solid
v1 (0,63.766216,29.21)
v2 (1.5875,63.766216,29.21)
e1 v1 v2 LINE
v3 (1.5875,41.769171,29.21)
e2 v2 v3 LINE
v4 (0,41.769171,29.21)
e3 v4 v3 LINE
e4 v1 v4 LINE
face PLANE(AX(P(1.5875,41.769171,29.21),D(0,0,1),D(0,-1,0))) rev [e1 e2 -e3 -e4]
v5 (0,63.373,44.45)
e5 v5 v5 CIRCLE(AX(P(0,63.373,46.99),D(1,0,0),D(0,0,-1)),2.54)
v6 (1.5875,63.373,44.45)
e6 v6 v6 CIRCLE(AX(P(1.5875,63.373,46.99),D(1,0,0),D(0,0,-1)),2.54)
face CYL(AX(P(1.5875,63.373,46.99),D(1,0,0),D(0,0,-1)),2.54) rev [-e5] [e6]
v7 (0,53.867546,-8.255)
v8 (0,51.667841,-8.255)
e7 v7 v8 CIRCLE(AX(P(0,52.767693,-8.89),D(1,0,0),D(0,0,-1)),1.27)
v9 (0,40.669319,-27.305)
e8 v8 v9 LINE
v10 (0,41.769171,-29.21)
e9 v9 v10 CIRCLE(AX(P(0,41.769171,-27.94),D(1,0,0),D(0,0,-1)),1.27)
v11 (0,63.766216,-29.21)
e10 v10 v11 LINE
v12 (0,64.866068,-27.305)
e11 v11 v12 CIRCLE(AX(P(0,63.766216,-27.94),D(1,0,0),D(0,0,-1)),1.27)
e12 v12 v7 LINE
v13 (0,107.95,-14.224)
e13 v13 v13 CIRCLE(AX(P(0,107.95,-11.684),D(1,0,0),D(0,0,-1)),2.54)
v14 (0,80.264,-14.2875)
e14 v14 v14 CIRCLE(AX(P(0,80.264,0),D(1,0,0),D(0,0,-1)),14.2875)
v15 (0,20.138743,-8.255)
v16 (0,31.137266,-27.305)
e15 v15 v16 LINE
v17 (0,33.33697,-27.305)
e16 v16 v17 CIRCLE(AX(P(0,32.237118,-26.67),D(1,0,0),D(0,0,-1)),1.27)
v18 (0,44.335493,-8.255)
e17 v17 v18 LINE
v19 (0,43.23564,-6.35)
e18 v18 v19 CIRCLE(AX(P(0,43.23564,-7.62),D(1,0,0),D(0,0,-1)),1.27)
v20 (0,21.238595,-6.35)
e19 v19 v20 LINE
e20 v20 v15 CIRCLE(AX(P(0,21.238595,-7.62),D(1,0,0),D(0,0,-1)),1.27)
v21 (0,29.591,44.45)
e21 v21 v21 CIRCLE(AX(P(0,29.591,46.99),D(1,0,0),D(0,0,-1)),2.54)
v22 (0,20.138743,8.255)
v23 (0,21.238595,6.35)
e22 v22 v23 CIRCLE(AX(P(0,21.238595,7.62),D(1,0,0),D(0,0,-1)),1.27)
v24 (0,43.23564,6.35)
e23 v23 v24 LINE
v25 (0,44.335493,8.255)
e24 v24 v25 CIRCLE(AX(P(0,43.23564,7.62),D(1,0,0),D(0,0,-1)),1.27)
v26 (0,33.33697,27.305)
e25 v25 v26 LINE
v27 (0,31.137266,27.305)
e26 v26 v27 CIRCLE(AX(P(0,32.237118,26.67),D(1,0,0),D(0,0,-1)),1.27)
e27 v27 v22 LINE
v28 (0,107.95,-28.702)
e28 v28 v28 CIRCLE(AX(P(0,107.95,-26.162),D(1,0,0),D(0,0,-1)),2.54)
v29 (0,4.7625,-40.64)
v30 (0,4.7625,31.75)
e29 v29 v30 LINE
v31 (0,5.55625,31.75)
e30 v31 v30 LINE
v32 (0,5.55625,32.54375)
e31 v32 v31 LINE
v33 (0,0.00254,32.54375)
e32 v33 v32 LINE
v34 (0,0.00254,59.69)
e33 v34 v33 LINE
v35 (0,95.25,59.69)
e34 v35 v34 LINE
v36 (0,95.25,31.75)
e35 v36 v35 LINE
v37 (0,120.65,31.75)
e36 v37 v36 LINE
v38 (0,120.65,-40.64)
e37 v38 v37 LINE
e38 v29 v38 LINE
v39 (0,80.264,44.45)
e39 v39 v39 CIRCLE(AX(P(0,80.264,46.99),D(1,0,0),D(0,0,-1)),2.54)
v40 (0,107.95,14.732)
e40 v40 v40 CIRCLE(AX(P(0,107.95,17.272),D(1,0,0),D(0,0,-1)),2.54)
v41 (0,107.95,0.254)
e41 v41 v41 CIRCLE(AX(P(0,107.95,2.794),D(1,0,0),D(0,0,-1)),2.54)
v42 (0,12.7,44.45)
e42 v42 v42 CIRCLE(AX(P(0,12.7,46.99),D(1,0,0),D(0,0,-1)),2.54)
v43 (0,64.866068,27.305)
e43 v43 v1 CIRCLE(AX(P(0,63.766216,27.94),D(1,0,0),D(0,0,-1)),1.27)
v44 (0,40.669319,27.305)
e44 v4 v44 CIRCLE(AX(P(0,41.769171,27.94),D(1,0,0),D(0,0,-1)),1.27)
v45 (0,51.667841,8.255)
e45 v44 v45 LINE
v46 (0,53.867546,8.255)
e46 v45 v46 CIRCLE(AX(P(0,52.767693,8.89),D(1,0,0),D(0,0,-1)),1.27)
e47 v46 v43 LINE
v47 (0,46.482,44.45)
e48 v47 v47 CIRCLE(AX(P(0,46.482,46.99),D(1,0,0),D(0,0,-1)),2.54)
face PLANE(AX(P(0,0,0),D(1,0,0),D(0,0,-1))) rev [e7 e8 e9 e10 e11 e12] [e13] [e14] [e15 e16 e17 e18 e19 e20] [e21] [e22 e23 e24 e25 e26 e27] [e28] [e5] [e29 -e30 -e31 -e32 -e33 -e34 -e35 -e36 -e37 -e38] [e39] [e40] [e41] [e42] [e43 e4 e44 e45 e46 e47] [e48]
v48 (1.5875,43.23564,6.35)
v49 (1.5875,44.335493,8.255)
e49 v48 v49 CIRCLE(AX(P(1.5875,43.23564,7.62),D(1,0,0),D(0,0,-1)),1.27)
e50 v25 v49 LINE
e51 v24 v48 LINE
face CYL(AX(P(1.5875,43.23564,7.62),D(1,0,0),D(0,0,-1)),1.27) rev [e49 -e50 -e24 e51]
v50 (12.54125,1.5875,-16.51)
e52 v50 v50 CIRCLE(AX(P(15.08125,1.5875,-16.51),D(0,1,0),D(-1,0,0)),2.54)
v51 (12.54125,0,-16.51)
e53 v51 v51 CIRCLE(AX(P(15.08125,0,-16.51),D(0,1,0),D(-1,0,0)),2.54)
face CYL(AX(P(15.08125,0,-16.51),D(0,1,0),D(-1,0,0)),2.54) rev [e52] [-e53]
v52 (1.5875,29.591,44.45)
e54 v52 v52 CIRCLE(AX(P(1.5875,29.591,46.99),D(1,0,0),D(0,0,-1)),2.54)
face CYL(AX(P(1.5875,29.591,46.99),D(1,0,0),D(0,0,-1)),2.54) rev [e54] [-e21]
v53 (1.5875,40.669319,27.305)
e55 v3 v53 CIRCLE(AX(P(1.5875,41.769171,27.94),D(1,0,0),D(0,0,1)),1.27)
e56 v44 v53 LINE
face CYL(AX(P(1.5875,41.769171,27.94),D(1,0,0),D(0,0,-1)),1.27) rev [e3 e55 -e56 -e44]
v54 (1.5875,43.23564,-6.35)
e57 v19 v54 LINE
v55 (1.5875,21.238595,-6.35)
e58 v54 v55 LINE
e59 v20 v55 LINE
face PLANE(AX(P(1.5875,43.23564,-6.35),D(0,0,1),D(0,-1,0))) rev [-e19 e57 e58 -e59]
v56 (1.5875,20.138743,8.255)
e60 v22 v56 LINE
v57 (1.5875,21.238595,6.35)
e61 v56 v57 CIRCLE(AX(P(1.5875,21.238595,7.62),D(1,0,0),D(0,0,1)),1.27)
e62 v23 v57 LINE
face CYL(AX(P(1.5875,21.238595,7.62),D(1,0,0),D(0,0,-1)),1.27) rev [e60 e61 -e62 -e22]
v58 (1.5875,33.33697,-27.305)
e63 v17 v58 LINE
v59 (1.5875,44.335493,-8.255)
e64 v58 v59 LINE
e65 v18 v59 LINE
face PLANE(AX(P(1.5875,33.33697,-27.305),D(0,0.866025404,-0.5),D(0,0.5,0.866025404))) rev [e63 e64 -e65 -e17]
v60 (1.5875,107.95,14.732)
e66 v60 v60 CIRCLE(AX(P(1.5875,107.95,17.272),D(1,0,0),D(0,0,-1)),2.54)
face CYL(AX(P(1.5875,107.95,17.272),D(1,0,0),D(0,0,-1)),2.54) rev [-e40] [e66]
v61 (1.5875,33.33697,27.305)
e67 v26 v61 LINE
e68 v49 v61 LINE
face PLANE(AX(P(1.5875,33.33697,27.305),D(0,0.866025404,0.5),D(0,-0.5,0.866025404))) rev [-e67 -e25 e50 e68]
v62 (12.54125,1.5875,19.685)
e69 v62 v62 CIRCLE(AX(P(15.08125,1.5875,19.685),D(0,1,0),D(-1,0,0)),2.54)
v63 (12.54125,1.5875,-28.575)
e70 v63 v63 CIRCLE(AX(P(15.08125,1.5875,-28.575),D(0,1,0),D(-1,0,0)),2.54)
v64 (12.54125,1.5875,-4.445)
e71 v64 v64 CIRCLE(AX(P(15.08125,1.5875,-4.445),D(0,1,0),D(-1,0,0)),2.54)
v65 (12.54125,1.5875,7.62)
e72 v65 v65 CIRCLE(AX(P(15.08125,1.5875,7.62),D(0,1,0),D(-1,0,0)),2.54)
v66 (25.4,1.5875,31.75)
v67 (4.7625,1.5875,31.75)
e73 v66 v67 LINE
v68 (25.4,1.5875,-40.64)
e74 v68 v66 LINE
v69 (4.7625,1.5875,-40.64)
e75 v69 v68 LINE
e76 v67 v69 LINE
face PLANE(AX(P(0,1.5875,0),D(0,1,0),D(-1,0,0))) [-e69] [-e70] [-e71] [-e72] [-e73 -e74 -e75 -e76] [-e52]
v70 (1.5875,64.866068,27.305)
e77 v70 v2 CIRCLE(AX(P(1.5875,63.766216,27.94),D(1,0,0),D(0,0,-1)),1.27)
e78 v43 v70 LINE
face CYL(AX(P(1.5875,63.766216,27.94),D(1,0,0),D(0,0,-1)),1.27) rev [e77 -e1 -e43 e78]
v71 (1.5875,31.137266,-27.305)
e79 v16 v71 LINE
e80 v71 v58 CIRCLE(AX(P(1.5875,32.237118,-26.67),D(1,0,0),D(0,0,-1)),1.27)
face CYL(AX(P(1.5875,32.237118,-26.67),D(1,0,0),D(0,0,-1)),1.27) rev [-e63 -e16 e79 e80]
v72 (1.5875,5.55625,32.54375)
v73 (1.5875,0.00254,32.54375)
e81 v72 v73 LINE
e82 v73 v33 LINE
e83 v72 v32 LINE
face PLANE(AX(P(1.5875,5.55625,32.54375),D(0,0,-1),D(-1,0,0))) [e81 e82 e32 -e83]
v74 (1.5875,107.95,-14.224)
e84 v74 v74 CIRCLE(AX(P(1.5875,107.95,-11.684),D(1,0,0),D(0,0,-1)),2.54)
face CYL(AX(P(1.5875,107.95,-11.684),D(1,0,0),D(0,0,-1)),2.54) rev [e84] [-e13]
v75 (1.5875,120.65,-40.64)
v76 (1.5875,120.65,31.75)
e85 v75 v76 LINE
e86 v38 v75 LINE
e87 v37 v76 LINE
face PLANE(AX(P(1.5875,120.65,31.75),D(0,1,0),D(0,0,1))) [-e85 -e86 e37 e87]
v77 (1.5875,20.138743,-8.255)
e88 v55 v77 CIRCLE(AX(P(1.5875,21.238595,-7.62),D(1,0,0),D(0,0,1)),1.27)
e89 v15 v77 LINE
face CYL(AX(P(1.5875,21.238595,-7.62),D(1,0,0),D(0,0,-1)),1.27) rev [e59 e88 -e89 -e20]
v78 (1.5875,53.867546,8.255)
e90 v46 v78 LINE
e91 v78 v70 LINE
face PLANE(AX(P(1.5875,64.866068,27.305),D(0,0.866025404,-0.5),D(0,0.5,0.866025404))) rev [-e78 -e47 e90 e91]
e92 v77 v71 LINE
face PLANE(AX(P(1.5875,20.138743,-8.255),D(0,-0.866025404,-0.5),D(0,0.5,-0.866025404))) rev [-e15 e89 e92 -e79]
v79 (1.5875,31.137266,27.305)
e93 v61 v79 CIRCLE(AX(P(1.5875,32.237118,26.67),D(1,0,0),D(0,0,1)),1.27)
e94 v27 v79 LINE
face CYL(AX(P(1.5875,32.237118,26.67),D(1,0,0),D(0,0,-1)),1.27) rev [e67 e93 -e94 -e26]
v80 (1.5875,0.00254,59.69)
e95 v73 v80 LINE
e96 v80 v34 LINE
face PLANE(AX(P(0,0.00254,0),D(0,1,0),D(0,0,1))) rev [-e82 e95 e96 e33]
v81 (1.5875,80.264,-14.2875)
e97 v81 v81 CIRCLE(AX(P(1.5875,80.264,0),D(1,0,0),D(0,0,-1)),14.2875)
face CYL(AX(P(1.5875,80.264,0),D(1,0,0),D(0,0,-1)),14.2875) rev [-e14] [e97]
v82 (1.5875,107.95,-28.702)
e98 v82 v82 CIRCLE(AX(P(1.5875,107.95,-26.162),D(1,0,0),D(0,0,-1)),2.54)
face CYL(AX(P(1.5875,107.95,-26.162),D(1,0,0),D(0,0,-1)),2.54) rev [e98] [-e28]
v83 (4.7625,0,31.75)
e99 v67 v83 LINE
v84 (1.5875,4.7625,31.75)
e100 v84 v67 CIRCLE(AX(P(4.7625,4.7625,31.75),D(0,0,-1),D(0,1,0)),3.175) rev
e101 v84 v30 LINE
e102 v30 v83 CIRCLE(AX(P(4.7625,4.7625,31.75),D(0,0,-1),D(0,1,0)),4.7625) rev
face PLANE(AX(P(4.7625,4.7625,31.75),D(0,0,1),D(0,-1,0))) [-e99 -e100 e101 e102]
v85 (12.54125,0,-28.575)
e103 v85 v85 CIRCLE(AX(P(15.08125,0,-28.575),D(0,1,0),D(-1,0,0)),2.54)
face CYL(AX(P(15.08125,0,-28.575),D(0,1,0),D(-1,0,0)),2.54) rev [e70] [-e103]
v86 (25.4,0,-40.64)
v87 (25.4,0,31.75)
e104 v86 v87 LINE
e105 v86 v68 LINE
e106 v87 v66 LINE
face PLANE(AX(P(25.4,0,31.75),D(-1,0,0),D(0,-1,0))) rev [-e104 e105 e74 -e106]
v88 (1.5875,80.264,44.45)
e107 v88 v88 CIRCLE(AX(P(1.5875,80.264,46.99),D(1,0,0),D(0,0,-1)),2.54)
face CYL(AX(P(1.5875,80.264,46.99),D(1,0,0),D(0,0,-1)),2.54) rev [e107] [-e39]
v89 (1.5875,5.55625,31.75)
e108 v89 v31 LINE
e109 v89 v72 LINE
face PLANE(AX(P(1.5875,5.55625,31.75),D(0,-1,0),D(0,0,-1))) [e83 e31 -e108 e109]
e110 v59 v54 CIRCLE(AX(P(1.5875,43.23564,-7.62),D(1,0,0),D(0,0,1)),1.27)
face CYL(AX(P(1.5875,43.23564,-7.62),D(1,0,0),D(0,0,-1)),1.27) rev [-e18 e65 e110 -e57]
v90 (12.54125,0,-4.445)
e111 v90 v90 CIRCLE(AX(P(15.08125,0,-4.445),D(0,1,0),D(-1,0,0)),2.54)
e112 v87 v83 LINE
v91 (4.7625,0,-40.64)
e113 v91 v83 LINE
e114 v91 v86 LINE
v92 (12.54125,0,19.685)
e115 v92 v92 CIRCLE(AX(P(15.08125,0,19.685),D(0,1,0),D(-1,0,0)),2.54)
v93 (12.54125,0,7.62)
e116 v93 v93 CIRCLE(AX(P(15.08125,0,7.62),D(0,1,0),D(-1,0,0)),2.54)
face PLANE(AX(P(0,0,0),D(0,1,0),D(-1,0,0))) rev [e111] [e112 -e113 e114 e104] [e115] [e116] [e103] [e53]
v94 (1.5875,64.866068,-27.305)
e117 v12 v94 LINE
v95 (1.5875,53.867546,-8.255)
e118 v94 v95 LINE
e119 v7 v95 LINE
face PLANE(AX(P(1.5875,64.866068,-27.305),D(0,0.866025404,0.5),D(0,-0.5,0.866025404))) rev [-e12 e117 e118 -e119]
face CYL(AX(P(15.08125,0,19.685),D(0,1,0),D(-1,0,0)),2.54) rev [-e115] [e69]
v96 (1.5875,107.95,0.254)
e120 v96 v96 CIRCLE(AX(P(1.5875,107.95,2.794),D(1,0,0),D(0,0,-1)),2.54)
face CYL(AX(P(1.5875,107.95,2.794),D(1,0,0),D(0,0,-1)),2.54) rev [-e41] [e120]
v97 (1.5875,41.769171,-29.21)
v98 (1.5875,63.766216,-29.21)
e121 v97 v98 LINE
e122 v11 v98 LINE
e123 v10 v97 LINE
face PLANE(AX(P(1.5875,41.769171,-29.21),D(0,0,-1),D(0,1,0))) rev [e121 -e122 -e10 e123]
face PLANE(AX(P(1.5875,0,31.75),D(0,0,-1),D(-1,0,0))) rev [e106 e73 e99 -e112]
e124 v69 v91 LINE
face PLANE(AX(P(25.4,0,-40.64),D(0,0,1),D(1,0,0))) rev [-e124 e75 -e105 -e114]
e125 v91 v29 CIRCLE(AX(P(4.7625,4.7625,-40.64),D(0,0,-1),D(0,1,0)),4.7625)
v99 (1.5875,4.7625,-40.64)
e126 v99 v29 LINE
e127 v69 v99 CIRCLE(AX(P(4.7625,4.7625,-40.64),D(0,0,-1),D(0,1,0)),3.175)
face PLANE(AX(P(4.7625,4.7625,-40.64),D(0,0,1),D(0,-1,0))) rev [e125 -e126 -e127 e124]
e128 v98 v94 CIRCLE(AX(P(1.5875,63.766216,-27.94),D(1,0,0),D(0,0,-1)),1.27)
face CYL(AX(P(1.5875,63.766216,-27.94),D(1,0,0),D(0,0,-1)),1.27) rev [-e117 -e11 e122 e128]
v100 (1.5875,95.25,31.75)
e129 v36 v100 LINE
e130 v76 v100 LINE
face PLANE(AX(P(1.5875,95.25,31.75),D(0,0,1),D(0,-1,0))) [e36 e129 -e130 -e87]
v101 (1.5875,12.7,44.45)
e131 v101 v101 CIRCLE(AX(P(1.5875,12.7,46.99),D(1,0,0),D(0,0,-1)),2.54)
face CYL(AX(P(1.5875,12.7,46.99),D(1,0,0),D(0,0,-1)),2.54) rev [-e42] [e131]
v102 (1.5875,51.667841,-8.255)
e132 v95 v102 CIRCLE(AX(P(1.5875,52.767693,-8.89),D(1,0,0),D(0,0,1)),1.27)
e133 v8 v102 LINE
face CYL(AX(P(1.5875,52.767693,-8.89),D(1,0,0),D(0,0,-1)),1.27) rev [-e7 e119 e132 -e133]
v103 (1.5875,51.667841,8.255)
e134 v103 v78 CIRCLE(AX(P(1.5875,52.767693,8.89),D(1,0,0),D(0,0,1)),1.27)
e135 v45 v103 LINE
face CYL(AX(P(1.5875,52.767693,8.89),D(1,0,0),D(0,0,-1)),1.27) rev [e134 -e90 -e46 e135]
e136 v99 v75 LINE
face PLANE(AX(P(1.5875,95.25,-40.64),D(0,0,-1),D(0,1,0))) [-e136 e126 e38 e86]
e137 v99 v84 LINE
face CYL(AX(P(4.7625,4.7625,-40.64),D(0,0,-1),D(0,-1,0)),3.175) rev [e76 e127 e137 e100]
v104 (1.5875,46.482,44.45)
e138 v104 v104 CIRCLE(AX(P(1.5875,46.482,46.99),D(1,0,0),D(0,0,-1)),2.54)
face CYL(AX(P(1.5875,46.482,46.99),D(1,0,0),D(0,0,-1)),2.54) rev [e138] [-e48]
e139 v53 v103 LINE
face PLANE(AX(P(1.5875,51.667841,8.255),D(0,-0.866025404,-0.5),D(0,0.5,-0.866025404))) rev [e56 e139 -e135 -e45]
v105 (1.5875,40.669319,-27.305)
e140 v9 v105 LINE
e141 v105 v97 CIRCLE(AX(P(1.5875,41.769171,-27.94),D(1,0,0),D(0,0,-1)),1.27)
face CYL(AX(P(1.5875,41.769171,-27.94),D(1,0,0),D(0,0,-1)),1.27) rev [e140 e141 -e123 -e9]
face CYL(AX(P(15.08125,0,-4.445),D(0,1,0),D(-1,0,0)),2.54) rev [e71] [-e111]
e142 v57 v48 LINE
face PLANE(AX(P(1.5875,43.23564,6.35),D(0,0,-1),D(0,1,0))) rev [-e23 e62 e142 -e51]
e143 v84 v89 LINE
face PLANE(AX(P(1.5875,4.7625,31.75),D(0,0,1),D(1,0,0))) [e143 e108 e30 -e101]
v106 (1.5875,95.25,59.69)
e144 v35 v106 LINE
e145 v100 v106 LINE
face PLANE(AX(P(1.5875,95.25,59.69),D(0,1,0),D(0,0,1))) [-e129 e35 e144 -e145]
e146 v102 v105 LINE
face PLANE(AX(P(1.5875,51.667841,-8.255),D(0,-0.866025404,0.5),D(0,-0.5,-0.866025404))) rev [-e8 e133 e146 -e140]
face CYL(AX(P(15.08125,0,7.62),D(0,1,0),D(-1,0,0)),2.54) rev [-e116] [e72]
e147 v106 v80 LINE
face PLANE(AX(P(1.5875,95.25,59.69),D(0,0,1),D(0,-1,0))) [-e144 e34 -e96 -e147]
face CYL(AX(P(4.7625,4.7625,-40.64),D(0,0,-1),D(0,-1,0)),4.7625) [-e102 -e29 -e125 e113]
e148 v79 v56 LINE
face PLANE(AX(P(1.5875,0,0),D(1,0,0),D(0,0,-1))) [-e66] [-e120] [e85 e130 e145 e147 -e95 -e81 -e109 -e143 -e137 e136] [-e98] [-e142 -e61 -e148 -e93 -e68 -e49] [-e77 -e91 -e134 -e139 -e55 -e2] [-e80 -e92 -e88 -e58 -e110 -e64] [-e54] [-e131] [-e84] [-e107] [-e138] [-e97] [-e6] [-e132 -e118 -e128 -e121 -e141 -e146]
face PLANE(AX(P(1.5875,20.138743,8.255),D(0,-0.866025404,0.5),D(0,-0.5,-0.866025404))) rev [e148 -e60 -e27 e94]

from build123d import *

# Parameters (mm, degrees)
SKETCH2_R                     = 14.2875
SKETCH2_R_2                   = 2.54
BOSS_EXTRUDE1_DEPTH           = 1.5875
SKETCH7_W                     = 1.5875
SKETCH7_H                     = 27.94
CUT_EXTRUDE1_DEPTH            = 0.00254
EDGE_FLANGE2_STRIP_W          = 12.7
EDGE_FLANGE2_STRIP_H          = 1.5875
EDGE_FLANGE2_STRIP_CUT_DEPTH  = 72.39
EDGE_FLANGE2_RELIEF_W         = 13.49375
EDGE_FLANGE2_RELIEF_H         = 0.79375
EDGE_FLANGE2_RELIEF_CUT_DEPTH = 1.5875
EDGE_FLANGE2_DEPTH            = 72.39
SKETCH14_R                    = 2.54
CUT_EXTRUDE2_DEPTH            = 2.54


# Sheet-metal steps are written as plain solids
with BuildPart() as part:
    # Sketch2 → Boss-Extrude1 (new body)
    with BuildSketch(Plane(origin=(0, 0, 0), x_dir=(0, 0, -1), z_dir=(1, 0, 0))):
        Polygon((-59.69, 95.25), (-59.69, 0), (40.64, 0), (40.64, 95.25), (40.64, 120.65), (-31.75, 120.65), (-31.75, 95.25), align=None)
        with Locations((0, 80.264)):
            Circle(SKETCH2_R, mode=Mode.SUBTRACT)
        with Locations((-46.99, 80.264)):
            Circle(SKETCH2_R_2, mode=Mode.SUBTRACT)
        with Locations((-46.99, 63.373)):
            Circle(SKETCH2_R_2, mode=Mode.SUBTRACT)
        with Locations((-17.272, 107.95)):
            Circle(SKETCH2_R_2, mode=Mode.SUBTRACT)
        with Locations((-2.794, 107.95)):
            Circle(SKETCH2_R_2, mode=Mode.SUBTRACT)
        with Locations((11.684, 107.95)):
            Circle(SKETCH2_R_2, mode=Mode.SUBTRACT)
        with Locations((26.162, 107.95)):
            Circle(SKETCH2_R_2, mode=Mode.SUBTRACT)
        with Locations((-46.99, 46.482)):
            Circle(SKETCH2_R_2, mode=Mode.SUBTRACT)
        with Locations((-46.99, 29.591)):
            Circle(SKETCH2_R_2, mode=Mode.SUBTRACT)
        with Locations((-46.99, 12.7)):
            Circle(SKETCH2_R_2, mode=Mode.SUBTRACT)
        with BuildLine():
            Line((-27.305, 64.866068321), (-8.255, 53.867545693))
            ThreePointArc((-8.255, 53.867545693), (-7.62, 52.76769343), (-8.255, 51.667841167))
            Line((-8.255, 51.667841167), (-27.305, 40.669318539))
            ThreePointArc((-27.305, 40.669318539), (-28.575, 40.669318539), (-29.21, 41.769170802))
            Line((-29.21, 41.769170802), (-29.21, 63.766216058))
            ThreePointArc((-29.21, 63.766216058), (-28.575, 64.866068321), (-27.305, 64.866068321))
        make_face(mode=Mode.SUBTRACT)
        with BuildLine():
            Line((-6.35, 43.235640486), (-6.35, 21.238595229))
            ThreePointArc((-6.35, 21.238595229), (-6.985, 20.138742967), (-8.255, 20.138742967))
            Line((-8.255, 20.138742967), (-27.305, 31.137265595))
            ThreePointArc((-27.305, 31.137265595), (-27.94, 32.237117857), (-27.305, 33.33697012))
            Line((-27.305, 33.33697012), (-8.255, 44.335492748))
            ThreePointArc((-8.255, 44.335492748), (-6.985, 44.335492748), (-6.35, 43.235640486))
        make_face(mode=Mode.SUBTRACT)
        with BuildLine():
            Line((8.255, 20.138742967), (27.305, 31.137265595))
            ThreePointArc((27.305, 31.137265595), (27.94, 32.237117857), (27.305, 33.33697012))
            Line((27.305, 33.33697012), (8.255, 44.335492748))
            ThreePointArc((8.255, 44.335492748), (6.985, 44.335492748), (6.35, 43.235640486))
            Line((6.35, 43.235640486), (6.35, 21.238595229))
            ThreePointArc((6.35, 21.238595229), (6.985, 20.138742967), (8.255, 20.138742967))
        make_face(mode=Mode.SUBTRACT)
        with BuildLine():
            Line((8.255, 51.667841167), (27.305, 40.669318539))
            ThreePointArc((27.305, 40.669318539), (28.575, 40.669318539), (29.21, 41.769170802))
            Line((29.21, 41.769170802), (29.21, 63.766216058))
            ThreePointArc((29.21, 63.766216058), (28.575, 64.866068321), (27.305, 64.866068321))
            Line((27.305, 64.866068321), (8.255, 53.867545693))
            ThreePointArc((8.255, 53.867545693), (7.62, 52.76769343), (8.255, 51.667841167))
        make_face(mode=Mode.SUBTRACT)
    extrude(amount=BOSS_EXTRUDE1_DEPTH)

    # Sketch7 → Cut-Extrude1 (cut)
    with BuildSketch(Plane(origin=(0, 0, 0), x_dir=(-1, 0, 0), z_dir=(0, -1, 0))):
        with Locations((-0.79375, -45.72)):
            Rectangle(SKETCH7_W, SKETCH7_H)
    extrude(amount=-CUT_EXTRUDE1_DEPTH, mode=Mode.SUBTRACT)

    # Edge-Flange2 strip (across the edge) → Edge-Flange2 strip cut (cut)
    with BuildSketch(Plane(origin=(1.5875, 0, 31.75), x_dir=(0, 1, 0), z_dir=(0, 0, -1))):
        with Locations((-1.5875, -0.79375)):
            Rectangle(EDGE_FLANGE2_STRIP_W, EDGE_FLANGE2_STRIP_H)
    extrude(amount=EDGE_FLANGE2_STRIP_CUT_DEPTH, mode=Mode.SUBTRACT)

    # Edge-Flange2 relief (on the sheet) → Edge-Flange2 relief cut (cut)
    with BuildSketch(Plane(origin=(1.5875, 4.7625, 31.75), x_dir=(0, 1, 0), z_dir=(1, 0, 0))):
        with Locations((-5.953125, 0.396875)):
            Rectangle(EDGE_FLANGE2_RELIEF_W, EDGE_FLANGE2_RELIEF_H)
    extrude(amount=-EDGE_FLANGE2_RELIEF_CUT_DEPTH, mode=Mode.SUBTRACT)

    # Edge-Flange2 section (across the edge) → Edge-Flange2 (add)
    with BuildSketch(Plane(origin=(1.5875, 0, 31.75), x_dir=(0, 1, 0), z_dir=(0, 0, -1))):
        with BuildLine():
            Line((0, 3.175), (0, 23.8125))
            Line((0, 23.8125), (1.5875, 23.8125))
            Line((1.5875, 23.8125), (1.5875, 3.175))
            ThreePointArc((1.5875, 3.175), (2.51743597, 0.92993597), (4.7625, 0))
            Line((4.7625, 0), (4.7625, -1.5875))
            ThreePointArc((4.7625, -1.5875), (1.394903955, -0.192596045), (0, 3.175))
        make_face()
    extrude(amount=EDGE_FLANGE2_DEPTH)

    # Sketch14 → Cut-Extrude2 (cut)
    with BuildSketch(Plane(origin=(0, 1.5875, 0), x_dir=(1, 0, 0), z_dir=(0, 1, 0))):
        with Locations(Location((15.08125, -19.685, 0), (0, 0, 180))):
            Circle(SKETCH14_R)
        with Locations(Location((15.08125, -7.62, 0), (0, 0, 180))):
            Circle(SKETCH14_R)
        with Locations(Location((15.08125, 4.445, 0), (0, 0, 180))):
            Circle(SKETCH14_R)
        with Locations(Location((15.08125, 16.51, 0), (0, 0, 180))):
            Circle(SKETCH14_R)
        with Locations(Location((15.08125, 28.575, 0), (0, 0, 180))):
            Circle(SKETCH14_R)
    extrude(amount=-CUT_EXTRUDE2_DEPTH, mode=Mode.SUBTRACT)


solid = part.part
